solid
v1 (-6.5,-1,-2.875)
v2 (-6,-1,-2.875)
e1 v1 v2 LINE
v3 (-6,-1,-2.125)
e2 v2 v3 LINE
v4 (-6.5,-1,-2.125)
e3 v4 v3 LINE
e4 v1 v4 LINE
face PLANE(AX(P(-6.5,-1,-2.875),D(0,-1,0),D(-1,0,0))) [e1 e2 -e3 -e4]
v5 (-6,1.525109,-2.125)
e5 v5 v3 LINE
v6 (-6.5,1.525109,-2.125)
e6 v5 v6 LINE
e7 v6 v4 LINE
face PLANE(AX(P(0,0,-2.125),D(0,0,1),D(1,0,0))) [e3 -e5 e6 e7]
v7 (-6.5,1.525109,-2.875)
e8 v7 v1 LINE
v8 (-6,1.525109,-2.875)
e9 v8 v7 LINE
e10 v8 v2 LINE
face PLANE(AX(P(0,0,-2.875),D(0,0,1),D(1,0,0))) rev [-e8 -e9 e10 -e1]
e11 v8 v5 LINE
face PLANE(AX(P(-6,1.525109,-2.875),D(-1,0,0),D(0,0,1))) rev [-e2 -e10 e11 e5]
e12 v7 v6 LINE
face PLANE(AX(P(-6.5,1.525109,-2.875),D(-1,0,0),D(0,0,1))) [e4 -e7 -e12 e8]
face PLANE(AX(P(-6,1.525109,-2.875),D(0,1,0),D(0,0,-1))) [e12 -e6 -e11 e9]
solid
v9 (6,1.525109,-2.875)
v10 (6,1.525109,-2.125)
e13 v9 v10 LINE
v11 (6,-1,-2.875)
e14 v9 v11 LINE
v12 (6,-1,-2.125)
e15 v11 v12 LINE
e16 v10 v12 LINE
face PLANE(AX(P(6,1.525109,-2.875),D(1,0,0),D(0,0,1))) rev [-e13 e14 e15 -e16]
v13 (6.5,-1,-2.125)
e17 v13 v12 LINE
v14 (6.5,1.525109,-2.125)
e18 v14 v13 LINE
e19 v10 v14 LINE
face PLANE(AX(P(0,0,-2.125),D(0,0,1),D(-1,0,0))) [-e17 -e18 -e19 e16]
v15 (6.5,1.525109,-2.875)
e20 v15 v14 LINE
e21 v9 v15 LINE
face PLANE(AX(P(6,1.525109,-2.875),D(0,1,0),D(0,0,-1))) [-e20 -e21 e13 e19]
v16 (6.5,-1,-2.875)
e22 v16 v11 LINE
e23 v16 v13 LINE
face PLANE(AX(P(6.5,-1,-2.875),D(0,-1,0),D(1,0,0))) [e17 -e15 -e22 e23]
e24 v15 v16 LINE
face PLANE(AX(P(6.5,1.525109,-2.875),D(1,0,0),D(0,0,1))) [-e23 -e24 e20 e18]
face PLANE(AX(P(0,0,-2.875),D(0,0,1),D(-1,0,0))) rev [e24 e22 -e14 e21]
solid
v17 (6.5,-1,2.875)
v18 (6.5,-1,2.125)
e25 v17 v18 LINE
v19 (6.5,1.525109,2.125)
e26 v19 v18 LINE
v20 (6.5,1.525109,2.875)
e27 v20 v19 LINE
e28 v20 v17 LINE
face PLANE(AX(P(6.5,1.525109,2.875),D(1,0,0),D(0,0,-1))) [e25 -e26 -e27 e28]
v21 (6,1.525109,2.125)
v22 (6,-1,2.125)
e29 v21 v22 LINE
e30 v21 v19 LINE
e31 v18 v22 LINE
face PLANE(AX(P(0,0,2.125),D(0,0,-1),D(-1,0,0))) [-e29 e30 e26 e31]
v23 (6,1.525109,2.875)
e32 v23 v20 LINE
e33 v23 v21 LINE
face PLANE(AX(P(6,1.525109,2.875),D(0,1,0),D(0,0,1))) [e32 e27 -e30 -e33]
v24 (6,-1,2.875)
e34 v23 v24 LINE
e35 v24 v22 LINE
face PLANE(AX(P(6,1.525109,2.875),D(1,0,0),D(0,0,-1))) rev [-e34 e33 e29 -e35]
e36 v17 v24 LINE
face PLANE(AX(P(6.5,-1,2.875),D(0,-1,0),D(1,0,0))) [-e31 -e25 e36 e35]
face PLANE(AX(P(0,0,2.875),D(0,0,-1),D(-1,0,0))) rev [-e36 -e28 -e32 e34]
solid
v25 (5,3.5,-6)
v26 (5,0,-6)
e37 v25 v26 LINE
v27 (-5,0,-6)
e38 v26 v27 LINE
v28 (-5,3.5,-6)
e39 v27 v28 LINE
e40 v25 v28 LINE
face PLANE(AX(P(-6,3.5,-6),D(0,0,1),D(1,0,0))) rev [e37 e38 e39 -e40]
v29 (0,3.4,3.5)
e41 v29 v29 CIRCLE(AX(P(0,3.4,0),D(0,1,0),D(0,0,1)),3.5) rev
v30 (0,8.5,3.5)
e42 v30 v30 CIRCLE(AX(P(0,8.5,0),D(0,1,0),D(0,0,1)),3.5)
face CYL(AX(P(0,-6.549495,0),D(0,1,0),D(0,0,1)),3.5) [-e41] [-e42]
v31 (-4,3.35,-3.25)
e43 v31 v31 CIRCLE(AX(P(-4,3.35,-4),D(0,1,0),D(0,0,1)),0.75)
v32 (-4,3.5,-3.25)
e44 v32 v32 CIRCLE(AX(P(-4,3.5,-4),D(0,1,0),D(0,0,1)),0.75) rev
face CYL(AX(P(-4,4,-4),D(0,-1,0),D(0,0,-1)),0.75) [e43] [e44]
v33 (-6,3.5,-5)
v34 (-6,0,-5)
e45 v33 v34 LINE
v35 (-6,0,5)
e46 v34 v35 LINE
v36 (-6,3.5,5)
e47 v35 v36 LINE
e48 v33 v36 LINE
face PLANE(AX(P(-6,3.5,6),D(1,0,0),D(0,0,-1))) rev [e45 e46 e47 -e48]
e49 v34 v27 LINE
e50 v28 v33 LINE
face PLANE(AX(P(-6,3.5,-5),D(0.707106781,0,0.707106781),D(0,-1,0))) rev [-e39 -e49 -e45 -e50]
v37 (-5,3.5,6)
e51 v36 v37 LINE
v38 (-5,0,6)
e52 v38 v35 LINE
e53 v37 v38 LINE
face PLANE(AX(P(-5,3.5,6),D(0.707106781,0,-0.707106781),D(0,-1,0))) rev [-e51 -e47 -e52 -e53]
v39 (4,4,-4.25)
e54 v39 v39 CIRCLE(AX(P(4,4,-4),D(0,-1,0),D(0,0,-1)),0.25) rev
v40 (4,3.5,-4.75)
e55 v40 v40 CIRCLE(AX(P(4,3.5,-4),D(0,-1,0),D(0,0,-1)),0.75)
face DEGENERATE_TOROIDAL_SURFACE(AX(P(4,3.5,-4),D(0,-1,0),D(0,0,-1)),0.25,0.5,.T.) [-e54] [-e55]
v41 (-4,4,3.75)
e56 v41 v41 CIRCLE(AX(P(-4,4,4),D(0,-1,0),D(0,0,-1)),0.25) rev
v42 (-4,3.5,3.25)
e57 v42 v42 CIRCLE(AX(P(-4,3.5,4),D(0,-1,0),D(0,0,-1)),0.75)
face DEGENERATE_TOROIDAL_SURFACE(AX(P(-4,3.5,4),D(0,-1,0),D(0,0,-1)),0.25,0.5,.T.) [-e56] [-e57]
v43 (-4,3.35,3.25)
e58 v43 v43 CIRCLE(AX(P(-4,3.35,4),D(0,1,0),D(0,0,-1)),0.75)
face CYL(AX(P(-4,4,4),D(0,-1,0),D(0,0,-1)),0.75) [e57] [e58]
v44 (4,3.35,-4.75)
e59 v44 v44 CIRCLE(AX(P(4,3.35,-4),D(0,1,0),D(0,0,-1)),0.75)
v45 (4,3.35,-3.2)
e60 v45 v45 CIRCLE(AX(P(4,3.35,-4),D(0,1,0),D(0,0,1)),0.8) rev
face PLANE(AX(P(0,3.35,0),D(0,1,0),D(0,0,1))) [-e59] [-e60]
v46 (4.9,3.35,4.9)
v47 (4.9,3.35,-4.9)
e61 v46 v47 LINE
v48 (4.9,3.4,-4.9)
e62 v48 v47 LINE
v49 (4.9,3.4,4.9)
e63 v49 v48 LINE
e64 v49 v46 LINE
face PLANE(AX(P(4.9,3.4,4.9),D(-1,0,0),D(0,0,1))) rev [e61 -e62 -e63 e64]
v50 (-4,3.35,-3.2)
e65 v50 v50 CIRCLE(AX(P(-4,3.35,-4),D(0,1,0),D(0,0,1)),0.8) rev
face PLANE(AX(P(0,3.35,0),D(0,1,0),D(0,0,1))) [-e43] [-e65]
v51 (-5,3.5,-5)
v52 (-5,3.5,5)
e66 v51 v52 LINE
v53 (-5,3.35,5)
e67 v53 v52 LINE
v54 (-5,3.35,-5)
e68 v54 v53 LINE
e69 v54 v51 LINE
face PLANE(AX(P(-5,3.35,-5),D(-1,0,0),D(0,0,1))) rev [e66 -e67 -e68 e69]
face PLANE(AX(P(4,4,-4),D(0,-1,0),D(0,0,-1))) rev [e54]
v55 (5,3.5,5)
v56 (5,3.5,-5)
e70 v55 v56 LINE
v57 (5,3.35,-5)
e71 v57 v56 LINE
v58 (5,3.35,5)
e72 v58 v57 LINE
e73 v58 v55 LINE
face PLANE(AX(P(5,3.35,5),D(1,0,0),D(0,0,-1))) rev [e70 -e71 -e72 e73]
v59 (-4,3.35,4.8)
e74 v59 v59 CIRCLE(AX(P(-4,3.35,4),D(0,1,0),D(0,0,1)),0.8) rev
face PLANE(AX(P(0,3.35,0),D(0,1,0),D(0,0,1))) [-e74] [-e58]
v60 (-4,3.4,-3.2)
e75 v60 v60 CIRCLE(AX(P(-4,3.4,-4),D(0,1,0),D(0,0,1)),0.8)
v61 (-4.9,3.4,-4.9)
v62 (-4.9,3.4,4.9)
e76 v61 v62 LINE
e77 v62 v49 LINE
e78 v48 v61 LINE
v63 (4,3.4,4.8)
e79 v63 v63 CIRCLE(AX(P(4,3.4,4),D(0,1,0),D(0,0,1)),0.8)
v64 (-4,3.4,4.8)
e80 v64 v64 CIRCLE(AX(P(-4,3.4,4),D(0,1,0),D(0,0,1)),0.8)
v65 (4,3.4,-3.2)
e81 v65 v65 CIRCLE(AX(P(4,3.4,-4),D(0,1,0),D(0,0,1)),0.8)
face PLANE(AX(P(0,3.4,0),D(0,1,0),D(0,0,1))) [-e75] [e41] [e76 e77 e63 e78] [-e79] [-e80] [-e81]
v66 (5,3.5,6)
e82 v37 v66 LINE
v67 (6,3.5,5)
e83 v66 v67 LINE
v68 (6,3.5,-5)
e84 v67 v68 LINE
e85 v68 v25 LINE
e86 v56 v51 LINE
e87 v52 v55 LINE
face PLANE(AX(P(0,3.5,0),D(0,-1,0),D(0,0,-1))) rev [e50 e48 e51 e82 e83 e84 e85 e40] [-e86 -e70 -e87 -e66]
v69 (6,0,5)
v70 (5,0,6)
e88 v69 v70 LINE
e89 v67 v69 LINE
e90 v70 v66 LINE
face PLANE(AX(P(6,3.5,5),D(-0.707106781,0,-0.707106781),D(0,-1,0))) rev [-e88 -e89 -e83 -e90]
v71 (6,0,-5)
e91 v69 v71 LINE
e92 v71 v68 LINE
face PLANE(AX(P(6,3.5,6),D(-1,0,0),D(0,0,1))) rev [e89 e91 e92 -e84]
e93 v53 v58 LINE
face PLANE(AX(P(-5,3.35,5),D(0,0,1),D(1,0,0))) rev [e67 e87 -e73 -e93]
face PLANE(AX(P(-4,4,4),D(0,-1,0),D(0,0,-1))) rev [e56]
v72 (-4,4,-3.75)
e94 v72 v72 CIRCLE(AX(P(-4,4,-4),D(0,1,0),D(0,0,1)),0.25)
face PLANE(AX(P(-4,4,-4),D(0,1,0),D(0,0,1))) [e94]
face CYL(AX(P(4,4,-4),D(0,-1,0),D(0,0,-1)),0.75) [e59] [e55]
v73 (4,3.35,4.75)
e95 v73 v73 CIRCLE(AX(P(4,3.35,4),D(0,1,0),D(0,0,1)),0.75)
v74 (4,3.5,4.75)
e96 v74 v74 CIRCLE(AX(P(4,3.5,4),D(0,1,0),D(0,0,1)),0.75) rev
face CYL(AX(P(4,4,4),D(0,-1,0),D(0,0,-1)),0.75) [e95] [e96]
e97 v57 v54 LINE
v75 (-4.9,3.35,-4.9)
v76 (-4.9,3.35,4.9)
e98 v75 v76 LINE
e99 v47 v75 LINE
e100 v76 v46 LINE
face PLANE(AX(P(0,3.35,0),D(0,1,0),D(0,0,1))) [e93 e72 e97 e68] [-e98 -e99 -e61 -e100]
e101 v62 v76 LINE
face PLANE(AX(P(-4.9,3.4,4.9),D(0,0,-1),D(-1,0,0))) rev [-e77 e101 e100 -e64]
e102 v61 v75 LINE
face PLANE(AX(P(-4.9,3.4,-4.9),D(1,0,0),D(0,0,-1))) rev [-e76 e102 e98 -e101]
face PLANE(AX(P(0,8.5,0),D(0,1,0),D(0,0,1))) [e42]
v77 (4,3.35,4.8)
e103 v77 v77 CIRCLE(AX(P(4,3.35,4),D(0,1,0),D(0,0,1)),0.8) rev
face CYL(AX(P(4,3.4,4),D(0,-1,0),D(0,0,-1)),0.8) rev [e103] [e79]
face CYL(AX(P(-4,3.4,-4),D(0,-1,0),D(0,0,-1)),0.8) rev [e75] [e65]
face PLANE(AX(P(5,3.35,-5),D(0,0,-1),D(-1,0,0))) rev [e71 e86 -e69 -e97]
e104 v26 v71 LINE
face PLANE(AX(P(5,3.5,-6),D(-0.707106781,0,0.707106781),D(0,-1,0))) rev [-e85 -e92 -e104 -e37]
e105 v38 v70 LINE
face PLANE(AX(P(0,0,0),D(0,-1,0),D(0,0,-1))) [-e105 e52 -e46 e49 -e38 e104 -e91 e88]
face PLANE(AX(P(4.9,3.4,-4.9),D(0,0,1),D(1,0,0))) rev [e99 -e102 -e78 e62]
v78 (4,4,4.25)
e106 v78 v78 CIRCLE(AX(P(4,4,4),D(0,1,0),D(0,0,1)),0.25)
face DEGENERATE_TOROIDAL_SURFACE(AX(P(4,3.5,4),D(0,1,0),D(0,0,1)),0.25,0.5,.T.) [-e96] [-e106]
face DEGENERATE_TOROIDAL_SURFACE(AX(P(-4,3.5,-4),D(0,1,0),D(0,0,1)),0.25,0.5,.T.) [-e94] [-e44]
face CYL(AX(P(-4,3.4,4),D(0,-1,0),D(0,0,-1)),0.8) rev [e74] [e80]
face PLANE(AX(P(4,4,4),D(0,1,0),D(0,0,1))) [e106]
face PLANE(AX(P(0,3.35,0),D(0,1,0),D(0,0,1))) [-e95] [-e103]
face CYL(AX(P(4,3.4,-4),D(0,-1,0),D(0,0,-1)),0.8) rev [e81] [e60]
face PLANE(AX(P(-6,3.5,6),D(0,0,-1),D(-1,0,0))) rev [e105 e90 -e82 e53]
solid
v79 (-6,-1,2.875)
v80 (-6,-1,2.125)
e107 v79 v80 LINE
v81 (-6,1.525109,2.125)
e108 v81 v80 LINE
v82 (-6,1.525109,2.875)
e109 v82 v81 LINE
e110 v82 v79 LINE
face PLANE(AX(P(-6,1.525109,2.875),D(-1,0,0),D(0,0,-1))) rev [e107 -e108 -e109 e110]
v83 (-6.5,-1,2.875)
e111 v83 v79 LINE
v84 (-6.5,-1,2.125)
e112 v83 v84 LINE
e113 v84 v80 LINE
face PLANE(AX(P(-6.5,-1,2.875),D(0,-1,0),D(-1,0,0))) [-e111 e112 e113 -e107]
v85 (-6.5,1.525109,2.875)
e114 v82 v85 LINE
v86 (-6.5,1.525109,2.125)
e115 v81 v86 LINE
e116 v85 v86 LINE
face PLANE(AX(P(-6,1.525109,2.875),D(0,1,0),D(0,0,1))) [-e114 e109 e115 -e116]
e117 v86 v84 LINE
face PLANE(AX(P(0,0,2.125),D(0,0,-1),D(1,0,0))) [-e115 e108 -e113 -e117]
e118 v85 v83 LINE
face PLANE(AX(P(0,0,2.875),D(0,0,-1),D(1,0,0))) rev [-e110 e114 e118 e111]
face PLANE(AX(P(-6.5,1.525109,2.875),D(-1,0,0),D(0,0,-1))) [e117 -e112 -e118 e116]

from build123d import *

# Parameters (mm, degrees)
SKETCH1_W                = 12
SKETCH1_H                = 12
BOSS_EXTRUDE1_DEPTH      = 3.5
SKETCH15_W               = 10
SKETCH15_H               = 10
CUT_EXTRUDE1_DEPTH       = 0.15
BOSS_EXTRUDE2_DEPTH      = 5
BOSS_EXTRUDE2_DEPTH_BACK = 3.5
SKETCH2_R                = 3.5
CHAMFER1_SIZE            = 1
SKETCH4_W                = 0.5
SKETCH4_H                = 2.525109238
BASE_FLANGE1_DEPTH       = 0.375
SKETCH16_R               = 0.75
BOSS_EXTRUDE3_DEPTH      = 0.65
FILLET1_R                = 0.5
SKETCH17_W               = 9.8
SKETCH17_H               = 9.8
SKETCH17_R               = 0.8
BOSS_EXTRUDE4_DEPTH      = 0.05


# Sheet-metal steps are written as plain solids
with BuildPart() as part:
    # Sketch1 → Boss-Extrude1 (new body)
    with BuildSketch(Plane(origin=(0, 0, 0), x_dir=(1, 0, 0), z_dir=(0, 1, 0))):
        Rectangle(SKETCH1_W, SKETCH1_H)
    extrude(amount=BOSS_EXTRUDE1_DEPTH)

    # Sketch15 → Cut-Extrude1 (cut)
    with BuildSketch(Plane(origin=(0, 3.5, 0), x_dir=(1, 0, 0), z_dir=(0, 1, 0))):
        Rectangle(SKETCH15_W, SKETCH15_H)
    extrude(amount=-CUT_EXTRUDE1_DEPTH, mode=Mode.SUBTRACT)

    # Sketch2 → Boss-Extrude2 (add, two sides: drawn at the far end of the back side and taken through both)
    with BuildSketch(Plane(origin=(0, 3.5, 0), x_dir=(1, 0, 0), z_dir=(0, 1, 0)).offset(-BOSS_EXTRUDE2_DEPTH_BACK)):
        with Locations(Location((0, 0, 0), (0, 0, 270))):
            Circle(SKETCH2_R)
    extrude(amount=BOSS_EXTRUDE2_DEPTH + BOSS_EXTRUDE2_DEPTH_BACK)

    # Chamfer1
    chamfer1_edges = [part.edges().sort_by_distance(p)[0] for p in [
        (6, 1.75, 6),
        (-6, 1.75, 6),
        (-6, 1.75, -6),
        (6, 1.75, -6),
    ]]
    chamfer(chamfer1_edges, length=CHAMFER1_SIZE)

    # Sketch16 → Boss-Extrude3 (add)
    with BuildSketch(Plane(origin=(0, 3.35, 0), x_dir=(1, 0, 0), z_dir=(0, 1, 0))):
        with Locations(Location((-4, 4, 0), (0, 0, 270))):
            Circle(SKETCH16_R)
        with Locations(Location((4, 4, 0), (0, 0, 90))):
            Circle(SKETCH16_R)
        with Locations(Location((4, -4, 0), (0, 0, 270))):
            Circle(SKETCH16_R)
        with Locations(Location((-4, -4, 0), (0, 0, 90))):
            Circle(SKETCH16_R)
    extrude(amount=BOSS_EXTRUDE3_DEPTH)

    # Fillet1
    fillet1_edges = [part.edges().sort_by_distance(p)[0] for p in [
        (-4, 4, -4.75),
        (4, 4, -3.25),
        (4, 4, 3.25),
        (-4, 4, 4.75),
    ]]
    fillet(fillet1_edges, radius=FILLET1_R)

    # Sketch17 → Boss-Extrude4 (add)
    with BuildSketch(Plane(origin=(0, 3.35, 0), x_dir=(1, 0, 0), z_dir=(0, 1, 0))):
        Rectangle(SKETCH17_W, SKETCH17_H)
        with Locations(Location((-4, 4, 0), (0, 0, 270))):
            Circle(SKETCH17_R, mode=Mode.SUBTRACT)
        with Locations(Location((4, 4, 0), (0, 0, 270))):
            Circle(SKETCH17_R, mode=Mode.SUBTRACT)
        with Locations(Location((-4, -4, 0), (0, 0, 270))):
            Circle(SKETCH17_R, mode=Mode.SUBTRACT)
        with Locations(Location((4, -4, 0), (0, 0, 270))):
            Circle(SKETCH17_R, mode=Mode.SUBTRACT)
    extrude(amount=BOSS_EXTRUDE4_DEPTH)


with BuildPart() as body_2:
    # Sketch4 → Base-Flange1 (new, symmetric)
    with BuildSketch(Plane.XY.offset(2.5)):
        with Locations((6.25, 0.262554619)):
            Rectangle(SKETCH4_W, SKETCH4_H)
    extrude(amount=BASE_FLANGE1_DEPTH, both=True)


with BuildPart() as body_3:
    # Mirror1: mirrored copy
    add(body_2.part.mirror(Plane.XY))


with BuildPart() as body_4:
    # Mirror2: mirrored copy
    add(body_2.part.mirror(Plane(origin=(0, 0, 0), x_dir=(0, 0, 1), z_dir=(1, 0, 0))))


with BuildPart() as body_5:
    # Mirror2 2: mirrored copy
    add(body_3.part.mirror(Plane(origin=(0, 0, 0), x_dir=(0, 0, 1), z_dir=(1, 0, 0))))


solid = Compound([part.part, body_2.part, body_3.part, body_4.part, body_5.part])
